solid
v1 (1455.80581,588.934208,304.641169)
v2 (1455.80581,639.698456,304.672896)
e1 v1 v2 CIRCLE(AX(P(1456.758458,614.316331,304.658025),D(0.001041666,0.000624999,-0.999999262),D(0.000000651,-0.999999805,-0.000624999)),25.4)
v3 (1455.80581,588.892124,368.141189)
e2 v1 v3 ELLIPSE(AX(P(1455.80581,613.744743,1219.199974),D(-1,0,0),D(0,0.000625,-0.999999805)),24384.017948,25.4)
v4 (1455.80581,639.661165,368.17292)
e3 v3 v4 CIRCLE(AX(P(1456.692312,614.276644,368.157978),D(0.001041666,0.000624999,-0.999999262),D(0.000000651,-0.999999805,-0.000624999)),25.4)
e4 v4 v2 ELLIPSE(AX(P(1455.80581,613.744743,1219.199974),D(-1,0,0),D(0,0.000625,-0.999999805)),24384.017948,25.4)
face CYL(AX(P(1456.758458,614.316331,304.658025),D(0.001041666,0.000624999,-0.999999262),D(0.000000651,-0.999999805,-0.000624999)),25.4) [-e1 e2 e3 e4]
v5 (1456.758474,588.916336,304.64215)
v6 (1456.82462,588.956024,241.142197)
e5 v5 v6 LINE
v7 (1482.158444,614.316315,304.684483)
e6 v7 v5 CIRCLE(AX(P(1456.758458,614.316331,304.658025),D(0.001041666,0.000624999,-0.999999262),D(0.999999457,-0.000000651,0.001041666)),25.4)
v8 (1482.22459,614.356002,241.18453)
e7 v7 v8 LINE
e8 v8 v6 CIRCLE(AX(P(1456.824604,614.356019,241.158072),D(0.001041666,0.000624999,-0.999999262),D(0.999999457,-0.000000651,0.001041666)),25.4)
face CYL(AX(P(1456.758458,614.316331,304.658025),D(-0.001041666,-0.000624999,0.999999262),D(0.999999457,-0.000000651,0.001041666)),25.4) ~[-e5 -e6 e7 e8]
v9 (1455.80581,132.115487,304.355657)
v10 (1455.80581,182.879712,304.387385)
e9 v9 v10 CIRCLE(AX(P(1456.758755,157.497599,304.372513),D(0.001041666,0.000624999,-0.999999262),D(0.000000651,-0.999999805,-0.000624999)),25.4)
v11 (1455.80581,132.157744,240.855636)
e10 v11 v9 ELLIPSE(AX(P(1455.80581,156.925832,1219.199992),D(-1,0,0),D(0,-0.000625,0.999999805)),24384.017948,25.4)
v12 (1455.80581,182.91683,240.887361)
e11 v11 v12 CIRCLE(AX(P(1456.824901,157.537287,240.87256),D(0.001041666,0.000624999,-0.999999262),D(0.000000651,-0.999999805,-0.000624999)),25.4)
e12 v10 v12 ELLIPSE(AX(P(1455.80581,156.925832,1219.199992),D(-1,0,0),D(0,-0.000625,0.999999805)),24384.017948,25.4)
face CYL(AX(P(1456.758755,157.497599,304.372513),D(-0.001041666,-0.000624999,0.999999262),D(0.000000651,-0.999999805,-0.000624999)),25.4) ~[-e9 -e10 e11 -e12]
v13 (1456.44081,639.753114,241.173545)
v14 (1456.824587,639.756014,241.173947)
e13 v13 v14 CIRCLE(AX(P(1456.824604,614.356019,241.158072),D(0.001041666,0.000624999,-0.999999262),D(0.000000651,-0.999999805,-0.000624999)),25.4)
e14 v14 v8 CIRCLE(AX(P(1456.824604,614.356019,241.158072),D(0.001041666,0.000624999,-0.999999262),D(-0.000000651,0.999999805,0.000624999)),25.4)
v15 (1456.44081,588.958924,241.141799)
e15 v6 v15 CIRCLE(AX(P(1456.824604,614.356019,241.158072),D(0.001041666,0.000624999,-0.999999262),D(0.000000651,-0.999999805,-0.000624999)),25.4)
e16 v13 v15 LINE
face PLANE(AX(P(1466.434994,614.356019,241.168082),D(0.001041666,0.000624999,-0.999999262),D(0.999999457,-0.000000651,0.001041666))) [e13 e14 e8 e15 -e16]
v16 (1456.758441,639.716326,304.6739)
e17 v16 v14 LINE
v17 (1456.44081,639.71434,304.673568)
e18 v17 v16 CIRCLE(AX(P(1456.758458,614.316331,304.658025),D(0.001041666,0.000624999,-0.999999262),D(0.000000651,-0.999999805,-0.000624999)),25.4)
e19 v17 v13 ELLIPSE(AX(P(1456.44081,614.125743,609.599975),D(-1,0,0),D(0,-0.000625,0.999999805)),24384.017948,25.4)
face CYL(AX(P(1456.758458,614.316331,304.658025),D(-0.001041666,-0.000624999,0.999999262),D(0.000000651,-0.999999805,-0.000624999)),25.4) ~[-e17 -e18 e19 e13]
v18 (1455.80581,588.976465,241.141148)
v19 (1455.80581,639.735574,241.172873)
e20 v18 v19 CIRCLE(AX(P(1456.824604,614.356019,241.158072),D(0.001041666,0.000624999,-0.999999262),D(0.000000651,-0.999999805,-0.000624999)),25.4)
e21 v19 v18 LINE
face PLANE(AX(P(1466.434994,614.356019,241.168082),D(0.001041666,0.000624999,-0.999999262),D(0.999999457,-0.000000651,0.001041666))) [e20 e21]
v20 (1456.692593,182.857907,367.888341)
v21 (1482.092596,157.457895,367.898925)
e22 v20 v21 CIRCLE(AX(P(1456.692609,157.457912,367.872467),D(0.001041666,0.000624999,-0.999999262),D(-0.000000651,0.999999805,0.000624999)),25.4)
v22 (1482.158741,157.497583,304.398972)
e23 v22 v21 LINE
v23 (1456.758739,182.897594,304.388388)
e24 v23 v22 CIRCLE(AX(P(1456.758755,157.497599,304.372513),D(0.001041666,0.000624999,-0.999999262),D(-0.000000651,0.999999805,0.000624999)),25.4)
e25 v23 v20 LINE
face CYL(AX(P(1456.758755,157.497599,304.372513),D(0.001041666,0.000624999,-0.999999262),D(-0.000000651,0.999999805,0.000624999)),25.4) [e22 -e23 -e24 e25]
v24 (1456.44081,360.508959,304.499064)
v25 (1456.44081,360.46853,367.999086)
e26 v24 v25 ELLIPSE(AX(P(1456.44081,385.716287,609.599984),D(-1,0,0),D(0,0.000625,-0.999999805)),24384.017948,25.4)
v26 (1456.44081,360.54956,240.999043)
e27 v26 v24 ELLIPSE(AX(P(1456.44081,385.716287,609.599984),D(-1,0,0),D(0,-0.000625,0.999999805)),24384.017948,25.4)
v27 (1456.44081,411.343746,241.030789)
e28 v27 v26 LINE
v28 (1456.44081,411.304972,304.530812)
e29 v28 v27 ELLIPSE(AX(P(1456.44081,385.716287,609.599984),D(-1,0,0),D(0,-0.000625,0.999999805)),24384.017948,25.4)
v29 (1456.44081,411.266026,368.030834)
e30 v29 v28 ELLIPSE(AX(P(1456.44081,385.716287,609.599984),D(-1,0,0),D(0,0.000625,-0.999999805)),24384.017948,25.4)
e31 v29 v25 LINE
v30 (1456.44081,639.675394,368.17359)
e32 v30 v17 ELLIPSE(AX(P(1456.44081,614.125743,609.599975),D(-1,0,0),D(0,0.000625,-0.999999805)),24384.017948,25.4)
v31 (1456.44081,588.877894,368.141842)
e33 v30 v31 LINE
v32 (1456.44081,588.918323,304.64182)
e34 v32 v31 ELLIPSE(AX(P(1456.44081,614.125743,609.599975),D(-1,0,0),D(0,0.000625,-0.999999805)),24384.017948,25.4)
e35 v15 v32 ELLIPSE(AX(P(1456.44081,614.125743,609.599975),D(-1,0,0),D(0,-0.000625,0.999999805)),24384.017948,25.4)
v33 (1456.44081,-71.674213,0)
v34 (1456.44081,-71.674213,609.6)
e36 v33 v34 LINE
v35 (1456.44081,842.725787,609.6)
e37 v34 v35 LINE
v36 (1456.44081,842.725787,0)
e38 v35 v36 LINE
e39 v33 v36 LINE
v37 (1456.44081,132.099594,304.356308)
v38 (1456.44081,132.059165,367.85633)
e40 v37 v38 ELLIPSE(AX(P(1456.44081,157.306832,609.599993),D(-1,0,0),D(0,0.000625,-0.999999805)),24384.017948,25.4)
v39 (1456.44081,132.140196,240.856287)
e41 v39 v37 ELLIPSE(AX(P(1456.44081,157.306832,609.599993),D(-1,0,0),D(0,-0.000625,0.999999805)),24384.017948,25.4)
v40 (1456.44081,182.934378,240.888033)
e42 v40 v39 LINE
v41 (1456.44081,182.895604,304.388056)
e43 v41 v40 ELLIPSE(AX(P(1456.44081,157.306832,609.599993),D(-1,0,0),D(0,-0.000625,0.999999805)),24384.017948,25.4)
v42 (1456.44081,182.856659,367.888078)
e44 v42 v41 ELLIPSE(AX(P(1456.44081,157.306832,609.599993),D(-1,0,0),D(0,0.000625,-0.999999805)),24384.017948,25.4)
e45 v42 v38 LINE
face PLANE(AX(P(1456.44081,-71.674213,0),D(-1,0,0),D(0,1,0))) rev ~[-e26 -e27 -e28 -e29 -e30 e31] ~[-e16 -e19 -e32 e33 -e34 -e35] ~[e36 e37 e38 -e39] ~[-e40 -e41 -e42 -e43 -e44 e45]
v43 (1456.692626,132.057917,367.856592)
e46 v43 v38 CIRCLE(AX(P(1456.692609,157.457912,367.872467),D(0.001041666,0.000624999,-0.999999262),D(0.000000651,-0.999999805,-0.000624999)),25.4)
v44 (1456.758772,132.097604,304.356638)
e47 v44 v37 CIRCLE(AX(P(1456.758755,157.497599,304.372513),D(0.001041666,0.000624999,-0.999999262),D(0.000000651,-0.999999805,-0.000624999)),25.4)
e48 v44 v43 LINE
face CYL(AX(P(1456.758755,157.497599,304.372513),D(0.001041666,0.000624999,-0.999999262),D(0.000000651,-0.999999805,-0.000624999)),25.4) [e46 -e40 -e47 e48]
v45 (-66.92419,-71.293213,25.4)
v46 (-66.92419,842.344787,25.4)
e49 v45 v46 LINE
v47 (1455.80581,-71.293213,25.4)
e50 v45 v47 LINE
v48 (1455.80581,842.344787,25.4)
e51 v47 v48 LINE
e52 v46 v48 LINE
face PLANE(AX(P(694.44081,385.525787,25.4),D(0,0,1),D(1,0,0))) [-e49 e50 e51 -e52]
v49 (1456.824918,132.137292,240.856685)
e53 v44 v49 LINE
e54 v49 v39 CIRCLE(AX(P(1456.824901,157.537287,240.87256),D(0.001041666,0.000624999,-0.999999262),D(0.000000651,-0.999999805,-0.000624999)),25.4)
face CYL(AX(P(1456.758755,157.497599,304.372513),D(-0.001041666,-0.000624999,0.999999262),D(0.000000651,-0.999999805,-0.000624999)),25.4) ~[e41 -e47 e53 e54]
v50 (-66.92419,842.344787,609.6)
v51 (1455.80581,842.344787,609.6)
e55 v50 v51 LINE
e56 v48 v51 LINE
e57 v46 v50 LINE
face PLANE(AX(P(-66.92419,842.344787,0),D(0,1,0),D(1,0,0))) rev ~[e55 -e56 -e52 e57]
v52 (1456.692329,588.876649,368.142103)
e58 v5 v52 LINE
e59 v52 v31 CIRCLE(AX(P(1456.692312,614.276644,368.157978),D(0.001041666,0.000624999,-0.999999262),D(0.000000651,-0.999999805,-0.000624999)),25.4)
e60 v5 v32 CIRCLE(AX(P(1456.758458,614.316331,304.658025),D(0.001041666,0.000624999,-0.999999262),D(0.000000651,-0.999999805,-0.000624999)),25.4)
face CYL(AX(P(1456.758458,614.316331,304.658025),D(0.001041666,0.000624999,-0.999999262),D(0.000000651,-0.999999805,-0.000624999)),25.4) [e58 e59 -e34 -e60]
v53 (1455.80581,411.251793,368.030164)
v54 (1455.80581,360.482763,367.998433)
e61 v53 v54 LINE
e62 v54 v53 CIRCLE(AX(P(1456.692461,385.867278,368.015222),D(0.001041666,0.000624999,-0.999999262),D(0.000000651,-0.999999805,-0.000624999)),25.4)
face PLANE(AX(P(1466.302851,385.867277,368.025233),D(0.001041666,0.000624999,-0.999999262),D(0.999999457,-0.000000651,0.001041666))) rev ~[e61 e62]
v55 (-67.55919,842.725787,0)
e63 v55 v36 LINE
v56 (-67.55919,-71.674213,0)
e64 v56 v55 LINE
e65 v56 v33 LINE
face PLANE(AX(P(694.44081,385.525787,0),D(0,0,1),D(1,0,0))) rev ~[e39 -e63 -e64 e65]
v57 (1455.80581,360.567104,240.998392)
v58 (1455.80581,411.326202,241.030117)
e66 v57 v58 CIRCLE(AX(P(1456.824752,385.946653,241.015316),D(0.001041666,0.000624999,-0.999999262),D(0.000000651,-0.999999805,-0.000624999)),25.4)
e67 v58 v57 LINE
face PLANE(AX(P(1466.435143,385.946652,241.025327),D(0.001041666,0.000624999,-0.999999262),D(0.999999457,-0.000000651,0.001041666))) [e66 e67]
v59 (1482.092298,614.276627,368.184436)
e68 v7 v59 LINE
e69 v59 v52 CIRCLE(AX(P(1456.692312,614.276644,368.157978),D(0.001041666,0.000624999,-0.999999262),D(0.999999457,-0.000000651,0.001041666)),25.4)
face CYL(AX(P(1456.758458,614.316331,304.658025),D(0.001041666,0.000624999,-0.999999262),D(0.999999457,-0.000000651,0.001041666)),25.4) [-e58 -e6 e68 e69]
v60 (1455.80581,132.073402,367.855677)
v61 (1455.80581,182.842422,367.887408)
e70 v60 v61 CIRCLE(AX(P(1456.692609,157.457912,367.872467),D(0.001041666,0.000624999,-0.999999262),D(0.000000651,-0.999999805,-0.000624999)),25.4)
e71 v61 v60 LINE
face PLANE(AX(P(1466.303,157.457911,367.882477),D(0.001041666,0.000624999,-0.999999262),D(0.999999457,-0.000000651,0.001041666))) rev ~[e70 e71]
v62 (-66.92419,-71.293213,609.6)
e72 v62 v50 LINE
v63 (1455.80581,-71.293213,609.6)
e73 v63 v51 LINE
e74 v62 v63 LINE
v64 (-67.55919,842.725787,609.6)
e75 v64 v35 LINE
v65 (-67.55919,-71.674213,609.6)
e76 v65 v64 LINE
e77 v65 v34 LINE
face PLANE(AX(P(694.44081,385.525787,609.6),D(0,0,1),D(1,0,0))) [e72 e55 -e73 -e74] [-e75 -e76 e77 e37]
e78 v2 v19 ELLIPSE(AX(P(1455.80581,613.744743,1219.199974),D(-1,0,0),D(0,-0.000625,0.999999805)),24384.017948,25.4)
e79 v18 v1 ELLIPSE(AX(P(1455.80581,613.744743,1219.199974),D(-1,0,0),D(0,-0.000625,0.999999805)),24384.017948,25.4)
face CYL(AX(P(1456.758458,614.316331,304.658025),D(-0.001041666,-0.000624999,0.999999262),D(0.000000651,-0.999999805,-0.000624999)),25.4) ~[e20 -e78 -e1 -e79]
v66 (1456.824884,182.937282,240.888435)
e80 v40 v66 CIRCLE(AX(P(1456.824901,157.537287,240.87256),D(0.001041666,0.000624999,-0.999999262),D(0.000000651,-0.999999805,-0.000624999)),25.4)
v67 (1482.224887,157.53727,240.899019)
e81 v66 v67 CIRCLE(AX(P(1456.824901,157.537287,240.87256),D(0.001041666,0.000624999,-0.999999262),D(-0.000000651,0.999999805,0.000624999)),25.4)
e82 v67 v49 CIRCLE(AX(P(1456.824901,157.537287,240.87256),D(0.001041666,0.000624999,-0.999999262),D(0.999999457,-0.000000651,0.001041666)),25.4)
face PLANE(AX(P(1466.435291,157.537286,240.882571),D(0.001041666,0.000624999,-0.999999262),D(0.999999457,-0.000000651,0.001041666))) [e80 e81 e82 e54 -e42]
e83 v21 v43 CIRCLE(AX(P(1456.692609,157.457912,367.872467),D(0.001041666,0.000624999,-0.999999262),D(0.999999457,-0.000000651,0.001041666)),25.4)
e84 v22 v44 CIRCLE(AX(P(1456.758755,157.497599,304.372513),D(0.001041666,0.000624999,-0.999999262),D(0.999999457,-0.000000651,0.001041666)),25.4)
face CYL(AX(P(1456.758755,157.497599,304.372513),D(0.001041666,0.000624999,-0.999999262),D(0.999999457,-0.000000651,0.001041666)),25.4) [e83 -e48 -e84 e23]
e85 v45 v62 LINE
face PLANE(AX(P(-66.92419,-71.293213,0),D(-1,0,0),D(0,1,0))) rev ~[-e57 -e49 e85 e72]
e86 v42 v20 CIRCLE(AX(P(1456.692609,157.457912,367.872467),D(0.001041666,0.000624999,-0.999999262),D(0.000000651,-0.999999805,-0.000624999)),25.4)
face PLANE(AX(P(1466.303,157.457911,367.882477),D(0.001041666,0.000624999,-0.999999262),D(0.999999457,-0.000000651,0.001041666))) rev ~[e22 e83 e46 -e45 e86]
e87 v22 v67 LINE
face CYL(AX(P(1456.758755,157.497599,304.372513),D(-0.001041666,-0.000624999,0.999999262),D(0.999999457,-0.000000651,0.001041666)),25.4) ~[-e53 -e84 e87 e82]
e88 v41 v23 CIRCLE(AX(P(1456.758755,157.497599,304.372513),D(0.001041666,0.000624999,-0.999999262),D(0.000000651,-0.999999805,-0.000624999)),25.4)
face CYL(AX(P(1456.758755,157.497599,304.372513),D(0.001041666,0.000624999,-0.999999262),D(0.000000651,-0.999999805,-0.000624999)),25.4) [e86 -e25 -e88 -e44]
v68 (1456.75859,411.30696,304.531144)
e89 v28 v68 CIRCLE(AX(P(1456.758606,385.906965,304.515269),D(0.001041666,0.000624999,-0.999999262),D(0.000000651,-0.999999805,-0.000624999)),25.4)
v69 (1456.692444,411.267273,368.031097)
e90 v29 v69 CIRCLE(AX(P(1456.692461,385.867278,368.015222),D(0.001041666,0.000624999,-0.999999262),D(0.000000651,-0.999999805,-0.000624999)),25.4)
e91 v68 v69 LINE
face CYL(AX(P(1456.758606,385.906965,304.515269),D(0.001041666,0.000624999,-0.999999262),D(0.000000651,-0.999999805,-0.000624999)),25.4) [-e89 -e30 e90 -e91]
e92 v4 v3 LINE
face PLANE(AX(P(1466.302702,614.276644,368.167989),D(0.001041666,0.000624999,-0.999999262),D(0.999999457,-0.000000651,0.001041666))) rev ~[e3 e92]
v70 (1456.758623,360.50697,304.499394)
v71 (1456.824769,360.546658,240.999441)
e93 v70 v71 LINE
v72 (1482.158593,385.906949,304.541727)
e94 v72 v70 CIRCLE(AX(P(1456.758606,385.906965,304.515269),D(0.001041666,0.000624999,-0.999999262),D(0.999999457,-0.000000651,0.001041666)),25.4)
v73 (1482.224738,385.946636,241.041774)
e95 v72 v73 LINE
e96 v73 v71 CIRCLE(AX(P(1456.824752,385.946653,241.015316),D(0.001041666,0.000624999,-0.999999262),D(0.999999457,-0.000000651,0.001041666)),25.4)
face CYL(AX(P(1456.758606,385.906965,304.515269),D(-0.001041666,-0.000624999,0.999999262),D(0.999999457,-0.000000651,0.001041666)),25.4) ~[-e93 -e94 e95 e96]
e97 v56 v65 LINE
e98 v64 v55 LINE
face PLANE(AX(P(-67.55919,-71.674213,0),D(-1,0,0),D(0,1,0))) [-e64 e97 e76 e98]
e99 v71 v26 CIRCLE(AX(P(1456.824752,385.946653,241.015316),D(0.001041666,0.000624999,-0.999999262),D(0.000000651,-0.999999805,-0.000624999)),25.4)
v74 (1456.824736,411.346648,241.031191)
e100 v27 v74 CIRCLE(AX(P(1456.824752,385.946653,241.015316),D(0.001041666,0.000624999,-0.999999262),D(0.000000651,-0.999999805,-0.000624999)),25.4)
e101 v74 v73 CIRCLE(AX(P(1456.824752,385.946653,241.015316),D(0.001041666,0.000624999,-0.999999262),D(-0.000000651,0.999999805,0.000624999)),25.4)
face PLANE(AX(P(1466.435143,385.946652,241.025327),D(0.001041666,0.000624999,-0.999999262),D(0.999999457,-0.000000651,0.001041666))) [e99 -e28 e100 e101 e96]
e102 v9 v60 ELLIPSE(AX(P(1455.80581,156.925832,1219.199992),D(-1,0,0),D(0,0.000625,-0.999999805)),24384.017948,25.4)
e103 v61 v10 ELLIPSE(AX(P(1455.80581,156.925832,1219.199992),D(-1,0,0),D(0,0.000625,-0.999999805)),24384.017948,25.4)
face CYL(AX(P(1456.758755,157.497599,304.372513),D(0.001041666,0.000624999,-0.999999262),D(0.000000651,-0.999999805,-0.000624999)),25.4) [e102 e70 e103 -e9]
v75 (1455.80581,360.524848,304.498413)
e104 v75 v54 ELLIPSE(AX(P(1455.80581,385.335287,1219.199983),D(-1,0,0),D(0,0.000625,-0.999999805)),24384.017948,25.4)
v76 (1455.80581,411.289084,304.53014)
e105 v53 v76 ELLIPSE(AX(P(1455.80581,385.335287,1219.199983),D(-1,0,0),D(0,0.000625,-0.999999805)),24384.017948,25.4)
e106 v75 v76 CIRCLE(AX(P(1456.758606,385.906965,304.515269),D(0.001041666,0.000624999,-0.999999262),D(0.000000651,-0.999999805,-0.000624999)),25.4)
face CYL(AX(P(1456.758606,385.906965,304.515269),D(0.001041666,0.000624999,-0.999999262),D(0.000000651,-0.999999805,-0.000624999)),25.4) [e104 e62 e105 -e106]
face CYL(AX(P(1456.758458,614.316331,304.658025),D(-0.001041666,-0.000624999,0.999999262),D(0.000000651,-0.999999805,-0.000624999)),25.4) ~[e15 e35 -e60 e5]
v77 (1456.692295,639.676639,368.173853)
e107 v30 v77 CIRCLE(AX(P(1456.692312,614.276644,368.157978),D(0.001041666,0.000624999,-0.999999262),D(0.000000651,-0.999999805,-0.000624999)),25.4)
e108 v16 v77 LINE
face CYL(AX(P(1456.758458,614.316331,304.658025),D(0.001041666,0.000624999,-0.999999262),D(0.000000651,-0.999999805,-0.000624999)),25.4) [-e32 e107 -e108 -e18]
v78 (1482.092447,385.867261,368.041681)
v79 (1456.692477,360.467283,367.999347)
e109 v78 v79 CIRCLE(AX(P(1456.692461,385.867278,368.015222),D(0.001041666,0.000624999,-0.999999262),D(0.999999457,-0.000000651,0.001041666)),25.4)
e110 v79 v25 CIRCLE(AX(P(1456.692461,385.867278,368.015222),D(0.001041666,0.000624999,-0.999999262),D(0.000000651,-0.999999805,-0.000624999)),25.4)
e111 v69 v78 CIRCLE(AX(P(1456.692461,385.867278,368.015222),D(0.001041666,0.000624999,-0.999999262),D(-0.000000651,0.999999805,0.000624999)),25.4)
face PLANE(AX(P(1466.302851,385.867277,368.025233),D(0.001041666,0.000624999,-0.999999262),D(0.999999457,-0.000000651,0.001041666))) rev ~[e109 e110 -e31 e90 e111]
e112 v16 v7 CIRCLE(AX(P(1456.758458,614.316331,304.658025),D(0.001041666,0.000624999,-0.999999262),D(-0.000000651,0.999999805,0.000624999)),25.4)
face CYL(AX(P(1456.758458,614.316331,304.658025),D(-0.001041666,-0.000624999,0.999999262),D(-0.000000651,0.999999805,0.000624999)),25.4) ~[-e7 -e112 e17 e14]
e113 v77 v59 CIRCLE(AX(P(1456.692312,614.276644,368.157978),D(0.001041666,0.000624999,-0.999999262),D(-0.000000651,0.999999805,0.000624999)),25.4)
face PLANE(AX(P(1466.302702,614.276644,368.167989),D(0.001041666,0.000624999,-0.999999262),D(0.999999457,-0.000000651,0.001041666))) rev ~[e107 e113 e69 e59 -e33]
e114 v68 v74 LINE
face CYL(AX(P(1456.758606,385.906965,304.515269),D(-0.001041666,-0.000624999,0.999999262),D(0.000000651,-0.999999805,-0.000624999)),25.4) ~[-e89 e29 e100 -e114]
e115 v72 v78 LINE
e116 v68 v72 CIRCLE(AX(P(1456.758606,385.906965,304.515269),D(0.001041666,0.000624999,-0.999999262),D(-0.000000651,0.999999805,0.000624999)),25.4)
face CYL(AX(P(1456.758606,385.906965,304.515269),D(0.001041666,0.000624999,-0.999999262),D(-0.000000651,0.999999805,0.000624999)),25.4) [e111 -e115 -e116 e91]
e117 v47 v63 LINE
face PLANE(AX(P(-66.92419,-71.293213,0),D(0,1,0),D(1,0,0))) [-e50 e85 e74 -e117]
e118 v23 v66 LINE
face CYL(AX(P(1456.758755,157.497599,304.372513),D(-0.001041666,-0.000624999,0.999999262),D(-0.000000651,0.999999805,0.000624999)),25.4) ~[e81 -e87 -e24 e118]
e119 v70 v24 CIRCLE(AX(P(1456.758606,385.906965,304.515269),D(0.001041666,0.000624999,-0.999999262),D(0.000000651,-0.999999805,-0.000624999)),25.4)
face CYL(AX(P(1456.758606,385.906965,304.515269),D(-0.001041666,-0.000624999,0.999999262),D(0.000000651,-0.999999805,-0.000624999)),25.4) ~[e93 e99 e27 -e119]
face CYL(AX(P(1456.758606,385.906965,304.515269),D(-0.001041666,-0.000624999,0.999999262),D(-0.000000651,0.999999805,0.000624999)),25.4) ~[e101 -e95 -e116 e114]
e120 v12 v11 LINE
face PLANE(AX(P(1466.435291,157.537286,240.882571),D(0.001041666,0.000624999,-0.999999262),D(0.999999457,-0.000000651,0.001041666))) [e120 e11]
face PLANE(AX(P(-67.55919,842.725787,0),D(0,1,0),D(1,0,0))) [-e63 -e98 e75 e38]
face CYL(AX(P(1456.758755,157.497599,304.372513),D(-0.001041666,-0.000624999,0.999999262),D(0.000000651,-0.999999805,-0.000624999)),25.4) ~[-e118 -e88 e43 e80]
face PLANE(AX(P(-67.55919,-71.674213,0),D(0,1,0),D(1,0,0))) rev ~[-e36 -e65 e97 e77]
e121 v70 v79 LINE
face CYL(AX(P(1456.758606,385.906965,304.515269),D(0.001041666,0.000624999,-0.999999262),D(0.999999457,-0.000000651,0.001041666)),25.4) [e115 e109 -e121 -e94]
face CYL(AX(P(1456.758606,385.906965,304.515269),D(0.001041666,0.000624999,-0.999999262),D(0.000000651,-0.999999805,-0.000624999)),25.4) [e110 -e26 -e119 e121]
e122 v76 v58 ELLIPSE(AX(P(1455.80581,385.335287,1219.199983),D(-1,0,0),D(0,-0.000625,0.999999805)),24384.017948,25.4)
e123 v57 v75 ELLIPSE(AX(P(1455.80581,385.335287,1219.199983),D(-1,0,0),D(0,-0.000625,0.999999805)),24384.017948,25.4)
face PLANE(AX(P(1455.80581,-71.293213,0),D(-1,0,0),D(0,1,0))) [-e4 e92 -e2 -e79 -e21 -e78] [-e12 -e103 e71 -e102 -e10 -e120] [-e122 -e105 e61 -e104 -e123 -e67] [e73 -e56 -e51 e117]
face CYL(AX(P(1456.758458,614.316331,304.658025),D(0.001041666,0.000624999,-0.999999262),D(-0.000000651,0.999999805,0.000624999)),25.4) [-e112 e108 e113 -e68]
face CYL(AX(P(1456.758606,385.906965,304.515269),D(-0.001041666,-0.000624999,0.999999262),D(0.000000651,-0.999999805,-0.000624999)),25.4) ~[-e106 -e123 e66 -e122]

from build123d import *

# Parameters (mm, degrees)
F1_W     = 1524
F1_H     = 914.4
F1_W_2   = 1522.73
F1_H_2   = 913.638
F2_DEPTH = 609.6
F0_W     = 1524
F0_H     = 914.4
F3_DEPTH = 25.4
F6_DEPTH = 63.5


with BuildPart() as f2:
    # F1 (on face) → F2 (new body)
    with BuildSketch(Plane.XY):
        with Locations((694.4408099055, 385.5257871866)):
            Rectangle(F1_W, F1_H)
        with Locations((694.4408099055, 385.5257871866)):
            Rectangle(F1_W_2, F1_H_2, mode=Mode.SUBTRACT)
    extrude(amount=F2_DEPTH)

    # F1 (on face) + F0 (on Top) → F3 (join)
    with BuildSketch(Plane.XY):
        with Locations((694.4408099055, 385.5257871866)):
            Rectangle(F1_W_2, F1_H_2)
    with BuildSketch(Plane.XY):
        with Locations((694.4408099055, 385.5257871866)):
            Rectangle(F0_W, F0_H)
    extrude(amount=F3_DEPTH)

    # F5 (on mid) → F6 (join, symmetric)
    with BuildSketch(Plane(origin=(-0.3153710141, -0.1892226085, 302.7561735554), x_dir=(0.9999994575, -6.51e-07, 0.0010416657), z_dir=(0.0010416659, 0.0006249995, -0.9999992622))):
        with BuildLine():
            ThreePointArc((1482.474916731, -157.6878010367), (1475.0354348197, -139.727294641), (1457.0749332675, -132.2878010367))
            Line((1457.0749332675, -132.2878010367), (1457.074916731, -157.6878010367))
            Line((1457.074916731, -157.6878010367), (1457.0749001946, -183.0878010367))
            ThreePointArc((1457.0749001946, -183.0878010367), (1475.0354231266, -175.6483191253), (1482.474916731, -157.6878010367))
        make_face()
        with BuildLine():
            ThreePointArc((1482.4747680271, -386.097211777), (1475.0352861157, -368.1367053814), (1457.0747845635, -360.697211777))
            Line((1457.0747845635, -360.697211777), (1457.0747680271, -386.097211777))
            Line((1457.0747680271, -386.097211777), (1457.0747514906, -411.497211777))
            ThreePointArc((1457.0747514906, -411.497211777), (1475.0352744227, -404.0577298657), (1482.4747680271, -386.097211777))
        make_face()
        with BuildLine():
            ThreePointArc((1482.4746193231, -614.5066225174), (1475.0351374118, -596.5461161218), (1457.0746358596, -589.1066225174))
            Line((1457.0746358596, -589.1066225174), (1457.0746193231, -614.5066225174))
            Line((1457.0746193231, -614.5066225174), (1457.0746027867, -639.9066225174))
            ThreePointArc((1457.0746027867, -639.9066225174), (1475.0351257188, -632.467140606), (1482.4746193231, -614.5066225174))
        make_face()
        with BuildLine():
            Line((1457.0746193231, -614.5066225174), (1457.0746358596, -589.1066225174))
            ThreePointArc((1457.0746358596, -589.1066225174), (1431.6746193231, -614.5066059809), (1457.0746027867, -639.9066225174))
            Line((1457.0746027867, -639.9066225174), (1457.0746193231, -614.5066225174))
        make_face()
        with BuildLine():
            Line((1457.0747680271, -386.097211777), (1457.0747845635, -360.697211777))
            ThreePointArc((1457.0747845635, -360.697211777), (1431.6747680271, -386.0971952406), (1457.0747514906, -411.497211777))
            Line((1457.0747514906, -411.497211777), (1457.0747680271, -386.097211777))
        make_face()
        with BuildLine():
            Line((1457.074916731, -157.6878010367), (1457.0749332675, -132.2878010367))
            ThreePointArc((1457.0749332675, -132.2878010367), (1431.674916731, -157.6877845002), (1457.0749001946, -183.0878010367))
            Line((1457.0749001946, -183.0878010367), (1457.074916731, -157.6878010367))
        make_face()
    extrude(amount=F6_DEPTH, both=True)


solid = f2.part
